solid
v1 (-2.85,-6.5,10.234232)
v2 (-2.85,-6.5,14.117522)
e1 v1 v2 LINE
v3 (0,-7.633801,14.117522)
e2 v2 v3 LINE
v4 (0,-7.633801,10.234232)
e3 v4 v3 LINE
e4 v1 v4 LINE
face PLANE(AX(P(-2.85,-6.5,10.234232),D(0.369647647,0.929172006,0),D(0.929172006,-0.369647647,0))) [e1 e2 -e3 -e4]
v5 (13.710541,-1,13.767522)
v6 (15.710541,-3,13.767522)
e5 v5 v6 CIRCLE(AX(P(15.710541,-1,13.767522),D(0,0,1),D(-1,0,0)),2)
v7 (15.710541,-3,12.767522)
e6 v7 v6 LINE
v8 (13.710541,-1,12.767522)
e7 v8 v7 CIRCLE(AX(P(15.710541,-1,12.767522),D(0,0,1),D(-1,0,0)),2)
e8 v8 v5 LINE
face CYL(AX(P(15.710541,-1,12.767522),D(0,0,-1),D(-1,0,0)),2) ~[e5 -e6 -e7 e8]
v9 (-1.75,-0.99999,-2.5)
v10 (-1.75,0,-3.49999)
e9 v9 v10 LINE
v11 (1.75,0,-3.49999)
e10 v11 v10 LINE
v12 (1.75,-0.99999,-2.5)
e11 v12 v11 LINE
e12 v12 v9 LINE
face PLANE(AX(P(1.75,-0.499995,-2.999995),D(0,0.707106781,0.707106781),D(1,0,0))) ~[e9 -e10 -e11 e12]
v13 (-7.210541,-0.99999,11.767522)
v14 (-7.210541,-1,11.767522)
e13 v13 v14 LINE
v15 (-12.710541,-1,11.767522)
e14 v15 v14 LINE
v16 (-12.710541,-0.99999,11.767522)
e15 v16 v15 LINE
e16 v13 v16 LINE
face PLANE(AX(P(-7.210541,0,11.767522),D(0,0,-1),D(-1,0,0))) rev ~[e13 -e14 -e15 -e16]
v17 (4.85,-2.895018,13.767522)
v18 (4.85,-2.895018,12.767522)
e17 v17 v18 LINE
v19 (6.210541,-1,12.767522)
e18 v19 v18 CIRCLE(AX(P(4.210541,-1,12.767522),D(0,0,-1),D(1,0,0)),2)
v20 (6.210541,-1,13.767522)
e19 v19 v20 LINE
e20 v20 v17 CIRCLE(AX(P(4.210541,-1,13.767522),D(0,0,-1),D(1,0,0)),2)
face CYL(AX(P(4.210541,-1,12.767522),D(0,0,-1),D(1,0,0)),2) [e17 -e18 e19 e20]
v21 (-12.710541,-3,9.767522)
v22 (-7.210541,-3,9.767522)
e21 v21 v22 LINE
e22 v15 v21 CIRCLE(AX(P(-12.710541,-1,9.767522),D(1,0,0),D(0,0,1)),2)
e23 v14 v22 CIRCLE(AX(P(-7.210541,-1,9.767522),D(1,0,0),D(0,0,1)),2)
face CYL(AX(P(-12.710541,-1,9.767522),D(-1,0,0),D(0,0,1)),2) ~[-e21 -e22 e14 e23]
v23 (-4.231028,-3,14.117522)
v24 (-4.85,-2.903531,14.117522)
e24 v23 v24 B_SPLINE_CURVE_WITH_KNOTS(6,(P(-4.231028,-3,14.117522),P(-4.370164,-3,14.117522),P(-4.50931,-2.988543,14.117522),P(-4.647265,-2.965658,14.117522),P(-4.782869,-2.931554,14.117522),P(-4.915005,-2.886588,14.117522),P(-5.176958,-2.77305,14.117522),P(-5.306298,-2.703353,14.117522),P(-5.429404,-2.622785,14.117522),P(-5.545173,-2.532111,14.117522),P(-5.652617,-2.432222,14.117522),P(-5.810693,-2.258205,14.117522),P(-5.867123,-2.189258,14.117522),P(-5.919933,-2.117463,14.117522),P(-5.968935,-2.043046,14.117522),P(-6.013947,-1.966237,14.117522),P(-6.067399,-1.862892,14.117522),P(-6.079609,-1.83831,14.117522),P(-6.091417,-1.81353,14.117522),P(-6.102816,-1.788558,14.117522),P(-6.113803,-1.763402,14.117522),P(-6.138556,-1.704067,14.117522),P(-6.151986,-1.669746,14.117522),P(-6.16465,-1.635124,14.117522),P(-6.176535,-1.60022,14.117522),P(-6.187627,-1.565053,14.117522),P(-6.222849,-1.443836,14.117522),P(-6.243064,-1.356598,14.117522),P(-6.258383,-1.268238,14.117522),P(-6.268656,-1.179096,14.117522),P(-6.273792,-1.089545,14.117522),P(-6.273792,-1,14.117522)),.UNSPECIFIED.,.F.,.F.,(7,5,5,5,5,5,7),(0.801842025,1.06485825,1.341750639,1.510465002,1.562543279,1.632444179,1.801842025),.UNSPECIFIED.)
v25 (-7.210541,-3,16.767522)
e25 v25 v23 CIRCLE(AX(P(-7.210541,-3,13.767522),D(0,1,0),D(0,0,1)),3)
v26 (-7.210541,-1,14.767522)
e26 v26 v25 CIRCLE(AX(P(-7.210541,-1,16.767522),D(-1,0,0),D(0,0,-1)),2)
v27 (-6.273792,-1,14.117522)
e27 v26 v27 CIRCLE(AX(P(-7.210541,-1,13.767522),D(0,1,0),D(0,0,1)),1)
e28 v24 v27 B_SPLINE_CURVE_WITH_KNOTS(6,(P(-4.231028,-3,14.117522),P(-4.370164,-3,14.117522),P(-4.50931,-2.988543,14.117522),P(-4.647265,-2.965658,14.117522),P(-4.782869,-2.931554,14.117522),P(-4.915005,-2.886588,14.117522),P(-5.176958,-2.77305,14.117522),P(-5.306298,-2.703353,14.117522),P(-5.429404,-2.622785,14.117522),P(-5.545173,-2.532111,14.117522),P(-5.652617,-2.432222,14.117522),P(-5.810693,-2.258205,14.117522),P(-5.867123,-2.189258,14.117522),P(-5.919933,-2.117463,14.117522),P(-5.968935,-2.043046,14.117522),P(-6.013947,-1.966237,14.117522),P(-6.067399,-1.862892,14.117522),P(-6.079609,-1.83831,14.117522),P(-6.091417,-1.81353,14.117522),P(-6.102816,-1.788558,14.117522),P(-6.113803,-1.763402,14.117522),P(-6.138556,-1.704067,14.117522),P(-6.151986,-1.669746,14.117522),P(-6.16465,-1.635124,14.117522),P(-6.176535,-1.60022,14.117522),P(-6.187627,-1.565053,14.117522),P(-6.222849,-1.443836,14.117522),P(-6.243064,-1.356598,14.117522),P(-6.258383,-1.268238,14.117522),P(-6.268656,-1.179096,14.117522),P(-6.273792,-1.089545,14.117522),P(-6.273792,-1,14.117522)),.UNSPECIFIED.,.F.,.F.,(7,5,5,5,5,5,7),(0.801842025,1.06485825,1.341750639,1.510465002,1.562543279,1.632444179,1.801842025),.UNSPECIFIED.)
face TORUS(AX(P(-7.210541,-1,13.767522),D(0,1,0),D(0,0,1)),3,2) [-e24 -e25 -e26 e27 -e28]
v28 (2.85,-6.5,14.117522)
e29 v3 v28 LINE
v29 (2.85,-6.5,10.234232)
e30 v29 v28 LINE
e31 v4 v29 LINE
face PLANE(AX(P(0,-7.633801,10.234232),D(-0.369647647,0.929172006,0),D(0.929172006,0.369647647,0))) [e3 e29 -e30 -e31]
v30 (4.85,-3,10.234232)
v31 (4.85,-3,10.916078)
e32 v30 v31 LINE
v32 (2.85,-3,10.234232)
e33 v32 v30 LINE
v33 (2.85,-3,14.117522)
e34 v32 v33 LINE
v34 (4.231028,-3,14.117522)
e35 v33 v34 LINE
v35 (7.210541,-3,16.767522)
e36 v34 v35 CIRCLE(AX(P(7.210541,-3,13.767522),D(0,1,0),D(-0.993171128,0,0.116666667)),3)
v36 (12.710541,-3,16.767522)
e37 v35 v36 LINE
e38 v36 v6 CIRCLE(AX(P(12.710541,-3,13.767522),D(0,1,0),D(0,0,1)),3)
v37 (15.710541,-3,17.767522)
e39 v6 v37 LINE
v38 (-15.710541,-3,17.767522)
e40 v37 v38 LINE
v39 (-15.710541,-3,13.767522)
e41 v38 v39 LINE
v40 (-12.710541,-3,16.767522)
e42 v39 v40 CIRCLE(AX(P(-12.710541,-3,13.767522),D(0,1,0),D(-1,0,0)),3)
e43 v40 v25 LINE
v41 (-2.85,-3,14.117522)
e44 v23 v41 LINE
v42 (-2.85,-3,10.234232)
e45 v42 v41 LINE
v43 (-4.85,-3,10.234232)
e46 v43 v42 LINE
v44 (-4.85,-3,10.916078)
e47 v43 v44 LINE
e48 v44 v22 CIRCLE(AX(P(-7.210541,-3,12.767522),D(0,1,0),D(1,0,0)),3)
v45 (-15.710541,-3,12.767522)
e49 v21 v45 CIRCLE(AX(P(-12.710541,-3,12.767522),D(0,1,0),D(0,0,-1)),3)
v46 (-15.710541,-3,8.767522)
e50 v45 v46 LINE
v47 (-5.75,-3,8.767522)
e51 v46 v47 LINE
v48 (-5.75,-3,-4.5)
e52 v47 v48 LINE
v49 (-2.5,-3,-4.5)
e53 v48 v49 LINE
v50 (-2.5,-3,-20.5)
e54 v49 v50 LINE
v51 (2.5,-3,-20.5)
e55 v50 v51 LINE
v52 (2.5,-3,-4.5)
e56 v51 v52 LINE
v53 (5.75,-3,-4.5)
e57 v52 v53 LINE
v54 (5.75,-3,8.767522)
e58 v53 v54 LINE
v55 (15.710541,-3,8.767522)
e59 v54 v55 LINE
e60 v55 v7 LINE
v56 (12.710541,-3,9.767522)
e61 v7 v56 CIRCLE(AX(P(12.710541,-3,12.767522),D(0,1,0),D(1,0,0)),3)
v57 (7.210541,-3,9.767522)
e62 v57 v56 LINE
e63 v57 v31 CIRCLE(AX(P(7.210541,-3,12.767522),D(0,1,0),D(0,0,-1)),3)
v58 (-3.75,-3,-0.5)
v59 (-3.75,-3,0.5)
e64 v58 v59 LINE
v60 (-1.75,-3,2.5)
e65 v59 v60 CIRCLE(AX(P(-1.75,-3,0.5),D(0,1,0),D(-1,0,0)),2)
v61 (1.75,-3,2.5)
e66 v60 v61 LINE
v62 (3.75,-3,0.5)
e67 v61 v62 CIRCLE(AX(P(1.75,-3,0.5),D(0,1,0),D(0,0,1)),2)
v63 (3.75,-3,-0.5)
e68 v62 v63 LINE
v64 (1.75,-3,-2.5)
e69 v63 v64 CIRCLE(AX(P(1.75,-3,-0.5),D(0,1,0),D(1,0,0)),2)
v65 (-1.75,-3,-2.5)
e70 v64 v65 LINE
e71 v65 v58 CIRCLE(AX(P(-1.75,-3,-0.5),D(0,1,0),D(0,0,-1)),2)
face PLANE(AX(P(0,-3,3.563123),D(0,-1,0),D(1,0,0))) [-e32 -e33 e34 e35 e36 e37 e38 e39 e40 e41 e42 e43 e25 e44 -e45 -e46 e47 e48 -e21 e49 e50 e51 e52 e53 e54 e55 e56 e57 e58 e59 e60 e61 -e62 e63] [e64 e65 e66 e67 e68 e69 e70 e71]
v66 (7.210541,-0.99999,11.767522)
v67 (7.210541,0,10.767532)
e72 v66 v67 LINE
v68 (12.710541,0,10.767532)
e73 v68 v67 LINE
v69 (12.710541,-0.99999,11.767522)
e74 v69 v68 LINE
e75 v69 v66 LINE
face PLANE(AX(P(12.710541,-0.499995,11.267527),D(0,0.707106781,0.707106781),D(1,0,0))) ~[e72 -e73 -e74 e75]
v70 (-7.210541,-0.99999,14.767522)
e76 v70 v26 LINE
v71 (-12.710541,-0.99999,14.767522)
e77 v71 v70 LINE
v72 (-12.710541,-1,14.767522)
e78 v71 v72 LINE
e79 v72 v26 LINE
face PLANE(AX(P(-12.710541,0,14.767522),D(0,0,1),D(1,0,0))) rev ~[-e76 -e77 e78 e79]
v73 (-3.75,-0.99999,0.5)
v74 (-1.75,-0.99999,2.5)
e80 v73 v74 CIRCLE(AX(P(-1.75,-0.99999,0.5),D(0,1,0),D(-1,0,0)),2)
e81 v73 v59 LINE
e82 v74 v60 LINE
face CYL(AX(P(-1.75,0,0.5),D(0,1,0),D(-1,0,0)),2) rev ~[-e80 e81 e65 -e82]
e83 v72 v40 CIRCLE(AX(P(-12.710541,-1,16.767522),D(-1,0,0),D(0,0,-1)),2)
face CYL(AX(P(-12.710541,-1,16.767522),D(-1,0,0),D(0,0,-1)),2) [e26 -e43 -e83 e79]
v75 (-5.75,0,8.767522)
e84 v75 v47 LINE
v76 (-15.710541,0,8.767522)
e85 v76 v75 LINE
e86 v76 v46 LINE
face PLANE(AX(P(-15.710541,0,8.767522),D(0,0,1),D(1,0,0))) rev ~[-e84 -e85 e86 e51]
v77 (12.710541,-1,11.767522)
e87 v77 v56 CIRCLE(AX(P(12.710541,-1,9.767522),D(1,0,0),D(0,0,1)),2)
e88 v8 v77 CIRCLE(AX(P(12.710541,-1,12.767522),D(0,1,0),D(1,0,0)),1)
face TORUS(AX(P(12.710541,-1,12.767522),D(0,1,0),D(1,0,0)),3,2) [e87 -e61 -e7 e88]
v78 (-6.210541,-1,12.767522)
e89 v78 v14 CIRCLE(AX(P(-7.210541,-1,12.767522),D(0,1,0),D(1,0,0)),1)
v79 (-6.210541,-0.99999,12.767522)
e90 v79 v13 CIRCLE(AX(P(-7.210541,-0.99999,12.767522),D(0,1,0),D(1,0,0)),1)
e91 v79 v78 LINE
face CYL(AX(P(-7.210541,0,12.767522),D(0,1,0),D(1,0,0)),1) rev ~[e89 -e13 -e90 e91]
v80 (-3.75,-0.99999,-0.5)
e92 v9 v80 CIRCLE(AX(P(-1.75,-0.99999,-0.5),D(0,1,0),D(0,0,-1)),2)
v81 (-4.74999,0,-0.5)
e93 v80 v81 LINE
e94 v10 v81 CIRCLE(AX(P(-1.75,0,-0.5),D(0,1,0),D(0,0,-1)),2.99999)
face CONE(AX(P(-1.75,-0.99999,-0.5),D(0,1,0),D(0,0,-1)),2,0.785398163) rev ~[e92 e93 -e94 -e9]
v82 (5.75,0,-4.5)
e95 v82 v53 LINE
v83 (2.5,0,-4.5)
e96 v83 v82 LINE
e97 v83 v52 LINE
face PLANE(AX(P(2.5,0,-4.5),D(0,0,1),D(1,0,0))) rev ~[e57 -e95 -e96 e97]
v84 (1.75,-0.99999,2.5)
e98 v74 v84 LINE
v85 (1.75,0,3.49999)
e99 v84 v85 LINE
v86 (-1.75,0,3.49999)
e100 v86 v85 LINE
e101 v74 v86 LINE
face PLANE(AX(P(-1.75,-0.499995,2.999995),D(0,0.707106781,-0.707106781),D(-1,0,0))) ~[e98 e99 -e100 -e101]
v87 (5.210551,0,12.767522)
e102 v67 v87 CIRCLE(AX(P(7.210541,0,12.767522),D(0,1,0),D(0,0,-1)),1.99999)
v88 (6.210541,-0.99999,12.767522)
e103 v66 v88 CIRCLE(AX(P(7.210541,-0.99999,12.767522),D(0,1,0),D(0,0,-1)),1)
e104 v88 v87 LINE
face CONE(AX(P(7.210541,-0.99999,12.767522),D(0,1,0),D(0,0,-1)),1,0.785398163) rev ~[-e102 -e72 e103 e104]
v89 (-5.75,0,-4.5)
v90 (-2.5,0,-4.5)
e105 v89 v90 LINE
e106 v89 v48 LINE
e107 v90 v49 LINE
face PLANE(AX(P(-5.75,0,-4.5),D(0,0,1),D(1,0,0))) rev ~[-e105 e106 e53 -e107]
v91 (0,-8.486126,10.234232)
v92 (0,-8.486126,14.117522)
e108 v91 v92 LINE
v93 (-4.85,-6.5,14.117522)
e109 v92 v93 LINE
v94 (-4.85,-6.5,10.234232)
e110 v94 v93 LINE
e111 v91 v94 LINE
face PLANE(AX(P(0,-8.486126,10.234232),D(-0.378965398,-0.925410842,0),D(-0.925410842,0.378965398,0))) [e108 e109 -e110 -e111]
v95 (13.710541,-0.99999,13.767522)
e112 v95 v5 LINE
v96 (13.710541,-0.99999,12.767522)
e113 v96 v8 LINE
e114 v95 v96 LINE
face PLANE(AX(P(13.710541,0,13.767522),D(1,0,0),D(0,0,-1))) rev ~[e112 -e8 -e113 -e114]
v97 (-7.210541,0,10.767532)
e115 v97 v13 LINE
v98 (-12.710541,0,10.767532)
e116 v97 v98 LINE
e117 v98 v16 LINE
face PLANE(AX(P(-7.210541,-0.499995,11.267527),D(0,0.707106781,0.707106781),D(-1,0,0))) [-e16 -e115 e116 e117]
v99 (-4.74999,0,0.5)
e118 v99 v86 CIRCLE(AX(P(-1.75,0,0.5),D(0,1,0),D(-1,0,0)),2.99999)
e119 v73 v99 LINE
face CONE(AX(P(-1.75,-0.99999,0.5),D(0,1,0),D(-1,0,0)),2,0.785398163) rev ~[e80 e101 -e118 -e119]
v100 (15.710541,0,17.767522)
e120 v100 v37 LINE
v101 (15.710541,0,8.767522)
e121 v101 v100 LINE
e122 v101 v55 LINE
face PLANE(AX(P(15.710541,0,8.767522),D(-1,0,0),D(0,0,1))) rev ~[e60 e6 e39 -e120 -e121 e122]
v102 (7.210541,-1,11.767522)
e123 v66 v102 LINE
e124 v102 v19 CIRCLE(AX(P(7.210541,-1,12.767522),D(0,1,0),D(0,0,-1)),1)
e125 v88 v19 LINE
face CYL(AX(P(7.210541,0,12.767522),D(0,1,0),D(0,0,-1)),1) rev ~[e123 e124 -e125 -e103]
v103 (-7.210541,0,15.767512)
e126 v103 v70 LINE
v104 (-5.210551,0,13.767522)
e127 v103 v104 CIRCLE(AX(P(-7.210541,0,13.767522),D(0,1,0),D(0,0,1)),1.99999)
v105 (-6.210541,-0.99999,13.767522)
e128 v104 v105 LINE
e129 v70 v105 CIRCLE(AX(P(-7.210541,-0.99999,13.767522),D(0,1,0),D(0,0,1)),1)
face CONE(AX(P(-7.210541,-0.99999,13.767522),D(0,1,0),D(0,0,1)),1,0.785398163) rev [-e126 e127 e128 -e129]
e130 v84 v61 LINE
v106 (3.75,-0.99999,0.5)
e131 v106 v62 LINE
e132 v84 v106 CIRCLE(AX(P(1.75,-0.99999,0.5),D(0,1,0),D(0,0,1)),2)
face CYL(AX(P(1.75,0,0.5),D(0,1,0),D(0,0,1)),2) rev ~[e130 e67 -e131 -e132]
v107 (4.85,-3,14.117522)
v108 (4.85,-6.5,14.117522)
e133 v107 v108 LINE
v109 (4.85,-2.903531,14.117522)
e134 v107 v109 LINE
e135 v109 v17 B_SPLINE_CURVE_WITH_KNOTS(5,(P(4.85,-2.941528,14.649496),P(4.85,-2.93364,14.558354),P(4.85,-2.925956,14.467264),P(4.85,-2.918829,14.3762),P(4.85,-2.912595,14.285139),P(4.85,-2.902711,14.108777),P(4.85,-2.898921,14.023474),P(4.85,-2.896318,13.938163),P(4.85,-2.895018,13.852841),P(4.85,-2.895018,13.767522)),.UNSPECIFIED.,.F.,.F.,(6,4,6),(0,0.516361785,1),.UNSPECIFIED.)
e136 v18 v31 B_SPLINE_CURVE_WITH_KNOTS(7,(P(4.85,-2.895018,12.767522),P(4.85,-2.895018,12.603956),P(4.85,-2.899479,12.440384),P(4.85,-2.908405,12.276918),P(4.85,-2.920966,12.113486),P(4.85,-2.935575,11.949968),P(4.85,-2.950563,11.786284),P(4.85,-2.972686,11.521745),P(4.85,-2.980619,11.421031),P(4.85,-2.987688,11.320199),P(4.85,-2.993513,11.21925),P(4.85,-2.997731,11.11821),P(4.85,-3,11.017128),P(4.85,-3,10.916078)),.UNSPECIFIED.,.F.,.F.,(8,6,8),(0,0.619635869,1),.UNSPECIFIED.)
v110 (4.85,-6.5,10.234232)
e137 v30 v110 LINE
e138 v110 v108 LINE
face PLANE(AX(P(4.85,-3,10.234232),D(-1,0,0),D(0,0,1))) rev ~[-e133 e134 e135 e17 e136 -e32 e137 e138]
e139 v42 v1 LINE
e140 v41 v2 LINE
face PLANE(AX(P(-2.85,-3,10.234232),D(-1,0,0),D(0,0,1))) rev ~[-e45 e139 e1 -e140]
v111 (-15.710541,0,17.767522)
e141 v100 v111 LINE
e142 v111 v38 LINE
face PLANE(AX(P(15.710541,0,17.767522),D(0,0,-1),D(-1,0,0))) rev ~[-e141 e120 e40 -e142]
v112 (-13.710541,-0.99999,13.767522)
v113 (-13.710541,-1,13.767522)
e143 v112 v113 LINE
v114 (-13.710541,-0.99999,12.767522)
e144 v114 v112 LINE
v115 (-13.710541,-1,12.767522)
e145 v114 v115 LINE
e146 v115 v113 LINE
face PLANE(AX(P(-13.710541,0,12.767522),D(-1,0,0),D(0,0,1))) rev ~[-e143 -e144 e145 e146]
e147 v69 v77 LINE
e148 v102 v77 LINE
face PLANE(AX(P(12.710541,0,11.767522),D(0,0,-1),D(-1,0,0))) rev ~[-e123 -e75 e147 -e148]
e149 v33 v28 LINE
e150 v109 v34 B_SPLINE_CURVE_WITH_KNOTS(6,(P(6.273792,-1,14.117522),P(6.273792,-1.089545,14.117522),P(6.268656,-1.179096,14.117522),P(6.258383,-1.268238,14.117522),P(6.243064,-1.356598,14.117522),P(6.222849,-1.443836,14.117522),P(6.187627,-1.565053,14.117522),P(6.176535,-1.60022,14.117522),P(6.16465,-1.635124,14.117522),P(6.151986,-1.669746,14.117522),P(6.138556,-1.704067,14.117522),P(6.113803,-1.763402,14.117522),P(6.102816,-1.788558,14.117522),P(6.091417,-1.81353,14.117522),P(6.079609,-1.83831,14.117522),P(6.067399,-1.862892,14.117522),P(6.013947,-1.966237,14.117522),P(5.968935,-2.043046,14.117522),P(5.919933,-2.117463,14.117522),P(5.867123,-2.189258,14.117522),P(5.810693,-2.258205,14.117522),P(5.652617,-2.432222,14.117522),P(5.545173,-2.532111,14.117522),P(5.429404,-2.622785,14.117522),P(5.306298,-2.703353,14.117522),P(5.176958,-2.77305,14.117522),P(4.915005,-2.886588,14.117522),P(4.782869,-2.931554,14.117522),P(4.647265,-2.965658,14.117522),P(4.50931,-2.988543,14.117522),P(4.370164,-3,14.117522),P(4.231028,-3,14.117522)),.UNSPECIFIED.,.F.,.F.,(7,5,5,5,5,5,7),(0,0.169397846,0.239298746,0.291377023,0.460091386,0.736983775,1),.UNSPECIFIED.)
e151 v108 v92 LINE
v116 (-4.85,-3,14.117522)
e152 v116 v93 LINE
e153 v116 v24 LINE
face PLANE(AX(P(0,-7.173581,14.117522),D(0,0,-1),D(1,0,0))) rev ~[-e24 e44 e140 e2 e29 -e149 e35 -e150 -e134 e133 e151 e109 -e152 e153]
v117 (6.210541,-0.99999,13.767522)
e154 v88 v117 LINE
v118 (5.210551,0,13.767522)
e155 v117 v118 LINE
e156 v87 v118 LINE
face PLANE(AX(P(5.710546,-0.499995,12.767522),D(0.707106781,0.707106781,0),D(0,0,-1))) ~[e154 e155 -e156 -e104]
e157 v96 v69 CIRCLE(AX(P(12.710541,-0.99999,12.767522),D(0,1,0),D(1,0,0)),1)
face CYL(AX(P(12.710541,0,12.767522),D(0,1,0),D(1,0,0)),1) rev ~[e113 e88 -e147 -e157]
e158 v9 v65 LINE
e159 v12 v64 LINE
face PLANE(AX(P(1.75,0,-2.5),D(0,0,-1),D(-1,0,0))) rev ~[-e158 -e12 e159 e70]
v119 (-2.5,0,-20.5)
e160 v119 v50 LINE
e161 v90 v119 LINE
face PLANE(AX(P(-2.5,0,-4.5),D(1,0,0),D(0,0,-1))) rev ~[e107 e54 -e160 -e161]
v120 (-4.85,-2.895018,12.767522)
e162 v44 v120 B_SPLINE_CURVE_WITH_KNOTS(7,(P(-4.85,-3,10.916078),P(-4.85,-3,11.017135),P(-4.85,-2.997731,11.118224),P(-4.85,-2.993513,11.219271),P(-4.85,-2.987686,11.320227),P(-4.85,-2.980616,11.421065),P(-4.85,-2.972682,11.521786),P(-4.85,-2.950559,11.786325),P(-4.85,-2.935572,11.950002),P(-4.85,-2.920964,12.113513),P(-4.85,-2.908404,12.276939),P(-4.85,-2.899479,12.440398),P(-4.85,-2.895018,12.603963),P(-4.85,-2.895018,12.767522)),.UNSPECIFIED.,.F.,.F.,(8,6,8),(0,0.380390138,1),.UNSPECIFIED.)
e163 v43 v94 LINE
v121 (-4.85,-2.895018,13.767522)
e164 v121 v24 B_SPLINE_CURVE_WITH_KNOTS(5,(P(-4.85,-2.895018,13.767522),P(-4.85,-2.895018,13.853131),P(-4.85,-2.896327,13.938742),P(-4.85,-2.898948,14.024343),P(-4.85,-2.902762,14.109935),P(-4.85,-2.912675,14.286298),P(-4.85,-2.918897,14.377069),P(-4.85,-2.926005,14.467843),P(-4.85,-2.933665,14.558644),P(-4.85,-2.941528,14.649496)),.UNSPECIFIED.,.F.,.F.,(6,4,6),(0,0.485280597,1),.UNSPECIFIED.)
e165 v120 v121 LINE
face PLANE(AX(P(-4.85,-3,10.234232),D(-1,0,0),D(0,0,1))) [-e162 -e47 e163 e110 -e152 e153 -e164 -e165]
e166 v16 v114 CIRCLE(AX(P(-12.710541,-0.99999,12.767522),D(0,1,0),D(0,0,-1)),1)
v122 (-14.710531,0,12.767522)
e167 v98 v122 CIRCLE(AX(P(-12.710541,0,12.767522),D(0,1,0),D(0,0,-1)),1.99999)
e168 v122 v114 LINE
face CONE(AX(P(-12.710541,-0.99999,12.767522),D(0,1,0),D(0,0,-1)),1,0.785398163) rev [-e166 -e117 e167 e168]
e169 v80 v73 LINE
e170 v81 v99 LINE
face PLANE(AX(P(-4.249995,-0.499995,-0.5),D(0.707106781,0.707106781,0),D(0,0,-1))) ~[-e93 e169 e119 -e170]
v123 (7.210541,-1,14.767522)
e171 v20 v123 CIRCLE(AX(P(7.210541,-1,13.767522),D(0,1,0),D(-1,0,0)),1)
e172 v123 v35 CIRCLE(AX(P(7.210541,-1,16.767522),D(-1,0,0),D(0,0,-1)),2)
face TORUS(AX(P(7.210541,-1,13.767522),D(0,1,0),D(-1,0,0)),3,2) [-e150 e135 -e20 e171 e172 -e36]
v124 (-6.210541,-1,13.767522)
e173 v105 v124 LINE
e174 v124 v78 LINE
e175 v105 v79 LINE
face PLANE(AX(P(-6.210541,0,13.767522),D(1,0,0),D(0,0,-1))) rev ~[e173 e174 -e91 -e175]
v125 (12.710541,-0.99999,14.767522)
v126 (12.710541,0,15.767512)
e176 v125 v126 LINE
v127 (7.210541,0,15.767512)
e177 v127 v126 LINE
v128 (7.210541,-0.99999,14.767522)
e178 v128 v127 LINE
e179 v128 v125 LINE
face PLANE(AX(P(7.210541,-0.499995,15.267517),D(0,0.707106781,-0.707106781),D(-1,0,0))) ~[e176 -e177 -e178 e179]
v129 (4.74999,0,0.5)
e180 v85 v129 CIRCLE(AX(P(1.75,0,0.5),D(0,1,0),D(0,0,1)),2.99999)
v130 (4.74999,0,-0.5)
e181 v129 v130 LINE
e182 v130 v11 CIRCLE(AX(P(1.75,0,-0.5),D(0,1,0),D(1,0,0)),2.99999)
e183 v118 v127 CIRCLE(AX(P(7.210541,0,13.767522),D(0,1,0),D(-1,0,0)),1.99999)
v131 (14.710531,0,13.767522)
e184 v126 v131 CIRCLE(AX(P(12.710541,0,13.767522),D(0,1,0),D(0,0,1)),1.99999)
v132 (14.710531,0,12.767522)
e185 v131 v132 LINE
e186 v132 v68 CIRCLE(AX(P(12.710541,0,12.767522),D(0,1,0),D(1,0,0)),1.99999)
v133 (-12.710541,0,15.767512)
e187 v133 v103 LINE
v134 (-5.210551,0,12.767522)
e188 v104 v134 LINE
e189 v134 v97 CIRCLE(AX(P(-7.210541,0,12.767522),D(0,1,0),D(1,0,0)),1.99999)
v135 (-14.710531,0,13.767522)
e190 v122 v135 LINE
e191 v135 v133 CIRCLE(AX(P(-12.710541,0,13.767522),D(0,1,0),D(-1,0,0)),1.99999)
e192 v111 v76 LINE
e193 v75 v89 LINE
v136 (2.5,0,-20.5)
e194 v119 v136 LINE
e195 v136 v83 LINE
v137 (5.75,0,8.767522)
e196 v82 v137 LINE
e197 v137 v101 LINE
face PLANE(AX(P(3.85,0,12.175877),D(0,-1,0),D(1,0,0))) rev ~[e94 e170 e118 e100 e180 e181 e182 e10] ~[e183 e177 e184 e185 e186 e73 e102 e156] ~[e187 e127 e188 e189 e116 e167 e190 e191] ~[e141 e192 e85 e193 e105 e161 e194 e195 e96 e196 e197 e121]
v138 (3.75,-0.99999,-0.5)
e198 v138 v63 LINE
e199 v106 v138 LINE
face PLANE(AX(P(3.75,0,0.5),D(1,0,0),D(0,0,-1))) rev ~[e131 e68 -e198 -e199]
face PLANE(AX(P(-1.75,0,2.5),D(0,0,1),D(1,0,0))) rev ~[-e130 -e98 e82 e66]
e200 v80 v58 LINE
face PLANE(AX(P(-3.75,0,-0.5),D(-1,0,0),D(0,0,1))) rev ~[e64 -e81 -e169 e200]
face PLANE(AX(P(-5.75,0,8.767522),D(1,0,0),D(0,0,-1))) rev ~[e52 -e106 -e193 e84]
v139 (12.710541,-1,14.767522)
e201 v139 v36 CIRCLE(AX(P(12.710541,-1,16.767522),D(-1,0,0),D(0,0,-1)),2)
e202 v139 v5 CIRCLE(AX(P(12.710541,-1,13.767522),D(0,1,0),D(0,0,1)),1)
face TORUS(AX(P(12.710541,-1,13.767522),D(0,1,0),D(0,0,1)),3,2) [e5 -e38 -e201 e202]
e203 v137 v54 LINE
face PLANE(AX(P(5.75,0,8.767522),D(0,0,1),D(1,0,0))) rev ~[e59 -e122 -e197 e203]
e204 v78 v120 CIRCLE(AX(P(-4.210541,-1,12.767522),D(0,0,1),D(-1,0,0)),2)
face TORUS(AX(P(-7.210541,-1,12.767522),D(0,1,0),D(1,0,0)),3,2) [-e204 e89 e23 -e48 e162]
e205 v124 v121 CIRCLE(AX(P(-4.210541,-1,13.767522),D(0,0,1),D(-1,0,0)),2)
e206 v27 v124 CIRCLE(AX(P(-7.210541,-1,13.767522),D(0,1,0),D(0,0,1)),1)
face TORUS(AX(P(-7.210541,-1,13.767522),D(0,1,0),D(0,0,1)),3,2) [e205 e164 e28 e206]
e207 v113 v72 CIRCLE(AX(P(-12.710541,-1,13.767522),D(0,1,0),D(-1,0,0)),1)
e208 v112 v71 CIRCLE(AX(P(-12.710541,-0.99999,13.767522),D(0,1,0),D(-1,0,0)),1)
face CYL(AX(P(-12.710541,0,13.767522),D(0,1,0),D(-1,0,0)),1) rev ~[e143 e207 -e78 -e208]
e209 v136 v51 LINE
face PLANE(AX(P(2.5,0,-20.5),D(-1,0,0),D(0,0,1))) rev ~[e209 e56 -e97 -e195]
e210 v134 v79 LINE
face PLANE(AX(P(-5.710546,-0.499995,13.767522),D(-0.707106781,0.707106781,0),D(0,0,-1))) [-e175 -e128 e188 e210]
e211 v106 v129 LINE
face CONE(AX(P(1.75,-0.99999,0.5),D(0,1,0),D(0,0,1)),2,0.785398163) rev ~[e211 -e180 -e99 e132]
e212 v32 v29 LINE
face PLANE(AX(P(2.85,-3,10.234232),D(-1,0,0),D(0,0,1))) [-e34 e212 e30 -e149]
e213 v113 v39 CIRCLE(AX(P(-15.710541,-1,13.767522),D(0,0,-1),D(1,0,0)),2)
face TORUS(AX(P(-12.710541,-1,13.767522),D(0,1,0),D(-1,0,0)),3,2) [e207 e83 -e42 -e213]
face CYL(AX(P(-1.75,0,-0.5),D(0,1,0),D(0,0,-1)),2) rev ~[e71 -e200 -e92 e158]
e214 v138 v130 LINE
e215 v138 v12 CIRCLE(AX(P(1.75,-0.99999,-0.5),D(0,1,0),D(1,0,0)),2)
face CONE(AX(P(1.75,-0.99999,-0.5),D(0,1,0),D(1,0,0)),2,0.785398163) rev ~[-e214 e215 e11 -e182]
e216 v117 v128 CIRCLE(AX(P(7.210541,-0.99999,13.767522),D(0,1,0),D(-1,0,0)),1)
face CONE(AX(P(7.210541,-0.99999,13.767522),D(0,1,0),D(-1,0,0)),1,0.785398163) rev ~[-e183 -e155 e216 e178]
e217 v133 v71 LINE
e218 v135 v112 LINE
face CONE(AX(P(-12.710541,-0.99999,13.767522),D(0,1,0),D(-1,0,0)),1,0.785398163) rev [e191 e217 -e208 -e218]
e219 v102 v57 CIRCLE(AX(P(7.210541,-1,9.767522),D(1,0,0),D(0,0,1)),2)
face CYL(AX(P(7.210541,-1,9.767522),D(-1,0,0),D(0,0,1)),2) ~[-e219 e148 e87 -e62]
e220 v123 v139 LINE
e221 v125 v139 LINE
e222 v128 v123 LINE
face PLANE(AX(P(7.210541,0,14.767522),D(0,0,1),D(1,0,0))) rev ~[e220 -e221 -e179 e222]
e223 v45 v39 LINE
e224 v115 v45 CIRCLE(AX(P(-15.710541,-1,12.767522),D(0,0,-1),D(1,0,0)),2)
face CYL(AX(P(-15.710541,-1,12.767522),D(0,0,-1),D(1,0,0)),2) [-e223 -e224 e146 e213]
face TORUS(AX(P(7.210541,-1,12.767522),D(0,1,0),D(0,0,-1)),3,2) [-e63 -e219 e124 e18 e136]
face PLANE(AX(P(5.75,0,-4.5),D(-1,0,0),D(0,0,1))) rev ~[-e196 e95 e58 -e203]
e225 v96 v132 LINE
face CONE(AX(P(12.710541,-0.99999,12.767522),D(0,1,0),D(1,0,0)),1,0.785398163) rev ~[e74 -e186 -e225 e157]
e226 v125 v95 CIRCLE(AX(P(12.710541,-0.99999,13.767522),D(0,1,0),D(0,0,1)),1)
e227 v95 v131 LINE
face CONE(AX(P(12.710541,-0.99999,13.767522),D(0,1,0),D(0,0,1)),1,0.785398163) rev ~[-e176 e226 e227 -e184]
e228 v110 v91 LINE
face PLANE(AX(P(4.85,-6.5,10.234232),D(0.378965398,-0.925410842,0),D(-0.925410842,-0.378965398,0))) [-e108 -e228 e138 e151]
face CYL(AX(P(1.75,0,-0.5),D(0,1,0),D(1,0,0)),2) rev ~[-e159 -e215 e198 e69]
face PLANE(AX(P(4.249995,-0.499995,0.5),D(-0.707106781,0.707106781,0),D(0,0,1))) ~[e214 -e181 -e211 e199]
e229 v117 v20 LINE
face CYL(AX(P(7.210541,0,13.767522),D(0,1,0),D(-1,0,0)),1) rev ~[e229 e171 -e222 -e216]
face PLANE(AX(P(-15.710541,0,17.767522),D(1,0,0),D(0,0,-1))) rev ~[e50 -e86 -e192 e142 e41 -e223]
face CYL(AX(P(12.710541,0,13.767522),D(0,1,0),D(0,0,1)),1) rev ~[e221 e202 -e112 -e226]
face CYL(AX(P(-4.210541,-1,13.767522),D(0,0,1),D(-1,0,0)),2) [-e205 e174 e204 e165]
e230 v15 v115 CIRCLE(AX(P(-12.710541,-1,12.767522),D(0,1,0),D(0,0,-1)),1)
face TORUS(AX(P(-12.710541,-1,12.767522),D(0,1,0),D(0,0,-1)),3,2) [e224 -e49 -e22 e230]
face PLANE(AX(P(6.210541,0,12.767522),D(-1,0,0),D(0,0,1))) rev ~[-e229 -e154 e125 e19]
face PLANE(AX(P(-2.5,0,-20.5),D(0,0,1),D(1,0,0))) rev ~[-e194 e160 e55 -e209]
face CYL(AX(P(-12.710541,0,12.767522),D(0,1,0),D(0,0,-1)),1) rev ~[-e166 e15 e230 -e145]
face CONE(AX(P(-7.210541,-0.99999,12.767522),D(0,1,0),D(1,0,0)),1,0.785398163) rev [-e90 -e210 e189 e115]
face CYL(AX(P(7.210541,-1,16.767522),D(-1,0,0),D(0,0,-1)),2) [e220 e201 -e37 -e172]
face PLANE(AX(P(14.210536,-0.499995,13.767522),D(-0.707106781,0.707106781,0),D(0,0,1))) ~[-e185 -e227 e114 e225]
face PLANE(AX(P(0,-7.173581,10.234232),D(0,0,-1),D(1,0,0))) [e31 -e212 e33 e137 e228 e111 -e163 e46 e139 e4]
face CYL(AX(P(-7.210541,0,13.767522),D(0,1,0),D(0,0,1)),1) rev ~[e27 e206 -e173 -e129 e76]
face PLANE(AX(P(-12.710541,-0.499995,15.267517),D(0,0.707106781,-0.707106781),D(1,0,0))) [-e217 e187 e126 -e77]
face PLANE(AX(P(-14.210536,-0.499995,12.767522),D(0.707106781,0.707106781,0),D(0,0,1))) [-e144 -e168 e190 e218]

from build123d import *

# Parameters (mm, degrees)
F0_W         = 2
F0_H         = 3.8832901515
F1_DEPTH     = 3
F2_DEPTH     = 3
F2_FACE_W    = 2
F2_FACE_H    = 3.8832901515
F3_DEPTH     = 3.5
F5_DEPTH     = 3.8832901515
F6_T1_DEPTH  = 5.5
F6_T3_DEPTH  = 5.5
F6_T5_DEPTH  = 1
F6_T8_ANGLE  = 90
F6_T12_ANGLE = 90
F6_T17_DEPTH = 1
F6_T22_ANGLE = 90
F6_T28_ANGLE = 90
F6_T34_ANGLE = 90
F6_T38_ANGLE = 90
F6_T42_ANGLE = 90
F6_T45_ANGLE = 90
F6_T47_ANGLE = 90
F6_T51_ANGLE = 90
F6_T57_ANGLE = 90
F6_T63_ANGLE = 90
F6_T69_DEPTH = 1
F7_SIZE      = 0.99999


# Not quite as in the source:
# - a fillet or chamfer that OpenCascade refuses, or shapes differently, is made with other operations: its cross-section is extruded or revolved along the edge and cut away or added
# - a fillet or chamfer is up to 0.001 mm smaller than in the source, because OpenCascade refuses the exact size


with BuildPart() as f1:
    # F0 (on Front) → F1 (new body)
    with BuildSketch(Plane.XZ):
        Polygon((15.7105413526, 17.7675217465), (-5.75, 17.7675217465), (-15.7105413526, 17.7675217465), (-15.7105413526, 8.7675217465), (-5.75, 8.7675217465), (-5.75, -4.5), (-2.5, -4.5), (-2.5, -20.5), (2.5, -20.5), (2.5, -4.5), (5.75, -4.5), (5.75, 8.7675217465), (15.7105413526, 8.7675217465), (15.7105413526, 15.6582586542), align=None)
        with BuildLine():
            Line((-12.7105413526, 14.7675217465), (-7.2105413526, 14.7675217465))
            ThreePointArc((-7.2105413526, 14.7675217465), (-6.5034345714, 14.4746285276), (-6.2105413526, 13.7675217465))
            Line((-6.2105413526, 13.7675217465), (-6.2105413526, 12.7675217465))
            ThreePointArc((-6.2105413526, 12.7675217465), (-6.5034345714, 12.0604149653), (-7.2105413526, 11.7675217465))
            Line((-7.2105413526, 11.7675217465), (-12.7105413526, 11.7675217465))
            ThreePointArc((-12.7105413526, 11.7675217465), (-13.4176481338, 12.0604149653), (-13.7105413526, 12.7675217465))
            Line((-13.7105413526, 12.7675217465), (-13.7105413526, 13.7675217465))
            ThreePointArc((-13.7105413526, 13.7675217465), (-13.4176481338, 14.4746285276), (-12.7105413526, 14.7675217465))
        make_face(mode=Mode.SUBTRACT)
        with Locations((-3.85, 12.1758766707)):
            Rectangle(F0_W, F0_H, mode=Mode.SUBTRACT)
        with BuildLine():
            ThreePointArc((-3.75, 0.5), (-3.1642135624, 1.9142135624), (-1.75, 2.5))
            Line((-1.75, 2.5), (1.75, 2.5))
            ThreePointArc((1.75, 2.5), (3.1642135624, 1.9142135624), (3.75, 0.5))
            Line((3.75, 0.5), (3.75, -0.5))
            ThreePointArc((3.75, -0.5), (3.1642135624, -1.9142135624), (1.75, -2.5))
            Line((1.75, -2.5), (-1.75, -2.5))
            ThreePointArc((-1.75, -2.5), (-3.1642135624, -1.9142135624), (-3.75, -0.5))
            Line((-3.75, -0.5), (-3.75, 0.5))
        make_face(mode=Mode.SUBTRACT)
        with Locations((3.85, 12.1758766707)):
            Rectangle(F0_W, F0_H, mode=Mode.SUBTRACT)
        with BuildLine():
            ThreePointArc((7.2105413526, 11.7675217465), (6.5034345714, 12.0604149653), (6.2105413526, 12.7675217465))
            Line((6.2105413526, 12.7675217465), (6.2105413526, 13.7675217465))
            ThreePointArc((6.2105413526, 13.7675217465), (6.5034345714, 14.4746285276), (7.2105413526, 14.7675217465))
            Line((7.2105413526, 14.7675217465), (12.7105413526, 14.7675217465))
            ThreePointArc((12.7105413526, 14.7675217465), (13.4176481338, 14.4746285276), (13.7105413526, 13.7675217465))
            Line((13.7105413526, 13.7675217465), (13.7105413526, 12.7675217465))
            ThreePointArc((13.7105413526, 12.7675217465), (13.4176481338, 12.0604149653), (12.7105413526, 11.7675217465))
            Line((12.7105413526, 11.7675217465), (7.2105413526, 11.7675217465))
        make_face(mode=Mode.SUBTRACT)
    extrude(amount=F1_DEPTH)



with BuildPart() as f2:
    # F0 (on Front) → F2 (new body, through all)
    with BuildSketch(Plane.XZ):
        with Locations((-3.85, 12.1758766707)):
            Rectangle(F0_W, F0_H)
    extrude(amount=F2_DEPTH)


with BuildPart() as f2b:
    # F0 (on Front) → F2, piece 2 (new body, through all)
    with BuildSketch(Plane.XZ):
        with Locations((3.85, 12.1758766707)):
            Rectangle(F0_W, F0_H)
    extrude(amount=F2_DEPTH)


with BuildPart() as f1_1:
    add(f1.part)

    add(f2.part)  # F3 merges F2

    add(f2b.part)  # F3 merges F2b
    # F2_face (on face) → F3 (join)
    with BuildSketch(Plane(origin=(-3.85, -3, 12.1758766707), x_dir=(1, 0, 0), z_dir=(0, -1, 0))):
        Rectangle(F2_FACE_W, F2_FACE_H)
        with Locations((7.7, 0)):
            Rectangle(F2_FACE_W, F2_FACE_H)
    extrude(amount=F3_DEPTH)

    # F4 (on face) → F5 (join, through all)
    with BuildSketch(Plane(origin=(0, 0, 10.2342315949), x_dir=(1, 0, 0), z_dir=(0, 0, -1))):
        Polygon((-4.85, 6.5), (-2.85, 6.5), (0, 7.6338006184), (2.85, 6.5), (4.85, 6.5), (0, 8.4861256182), align=None)
    extrude(amount=-F5_DEPTH)

    # F6: fillet of radius 2 on 2 edges, made by hand

    # F6_s2 → F6_t1 (cut)
    with BuildSketch(Plane.YZ.offset(-12.7105413526)):
        with BuildLine():
            ThreePointArc((-1, 11.7675217465), (-2.4142135624, 11.1817353088), (-3, 9.7675217465))
            Line((-3, 9.7675217465), (-3, 11.7675217465))
            Line((-3, 11.7675217465), (-1, 11.7675217465))
        make_face()
        with BuildLine():
            ThreePointArc((-1, 14.7675217465), (-2.4142135624, 15.3533081841), (-3, 16.7675217465))
            Line((-3, 16.7675217465), (-3, 14.7675217465))
            Line((-3, 14.7675217465), (-1, 14.7675217465))
        make_face()
    extrude(amount=F6_T1_DEPTH, mode=Mode.SUBTRACT)

    # F6_s4 → F6_t3 (cut)
    with BuildSketch(Plane.YZ.offset(7.2105413526)):
        with BuildLine():
            ThreePointArc((-1, 11.7675217465), (-2.4142135624, 11.1817353088), (-3, 9.7675217465))
            Line((-3, 9.7675217465), (-3, 11.7675217465))
            Line((-3, 11.7675217465), (-1, 11.7675217465))
        make_face()
        with BuildLine():
            ThreePointArc((-1, 14.7675217465), (-2.4142135624, 15.3533081841), (-3, 16.7675217465))
            Line((-3, 16.7675217465), (-3, 14.7675217465))
            Line((-3, 14.7675217465), (-1, 14.7675217465))
        make_face()
    extrude(amount=F6_T3_DEPTH, mode=Mode.SUBTRACT)

    # F6_s6 → F6_t5 (cut)
    with BuildSketch(Plane.XY.offset(12.7675217465)):
        with BuildLine():
            ThreePointArc((13.7105413526, -1), (14.2963277903, -2.4142135624), (15.7105413526, -3))
            Line((15.7105413526, -3), (13.7105413526, -3))
            Line((13.7105413526, -3), (13.7105413526, -1))
        make_face()
        with BuildLine():
            ThreePointArc((-13.7105413526, -1), (-14.2963277903, -2.4142135624), (-15.7105413526, -3))
            Line((-15.7105413526, -3), (-13.7105413526, -3))
            Line((-13.7105413526, -3), (-13.7105413526, -1))
        make_face()
    extrude(amount=F6_T5_DEPTH, mode=Mode.SUBTRACT)

    # F6_s7 → F6_t8 (revolve, cut)
    with BuildSketch(Plane.XY.offset(12.7675217465)):
        with BuildLine():
            ThreePointArc((13.7105413526, -1), (14.2963277903, -2.4142135624), (15.7105413526, -3))
            Line((15.7105413526, -3), (13.7105413526, -3))
            Line((13.7105413526, -3), (13.7105413526, -1))
        make_face()
    revolve(axis=Axis((12.7105413526, -3, 12.7675217465), (0, 1, 0)), revolution_arc=F6_T8_ANGLE, mode=Mode.SUBTRACT)


with BuildPart() as f6_tool10:
    # F6_s11 → F6_t12 (revolve)
    with BuildSketch(Plane.YZ.offset(7.2105413526)):
        with BuildLine():
            ThreePointArc((-1, 11.7675217465), (-2.4142135624, 11.1817353088), (-3, 9.7675217465))
            Line((-3, 9.7675217465), (-3, 11.7675217465))
            Line((-3, 11.7675217465), (-1, 11.7675217465))
        make_face()
    revolve(axis=Axis((7.2105413526, -3, 12.7675217465), (0, 1, 0)), revolution_arc=F6_T12_ANGLE)

    split(bisect_by=Plane.YZ.offset(4.85), keep=Keep.TOP)


with BuildPart() as f1_2:
    add(f1_1.part)

    # F6_t9: cut F6_tool10
    add(f6_tool10.part, mode=Mode.SUBTRACT)


with BuildPart() as f6_tool15:
    # F6_s16 → F6_t17 (new body)
    with BuildSketch(Plane.XY.offset(12.7675217465)):
        with BuildLine():
            ThreePointArc((6.2105413526, -1), (5.624754915, -2.4142135624), (4.2105413526, -3))
            Line((4.2105413526, -3), (6.2105413526, -3))
            Line((6.2105413526, -3), (6.2105413526, -1))
        make_face()
    extrude(amount=F6_T17_DEPTH)

    split(bisect_by=Plane.YZ.offset(4.85), keep=Keep.TOP)


with BuildPart() as f1_3:
    add(f1_2.part)

    # F6_t14: cut F6_tool15
    add(f6_tool15.part, mode=Mode.SUBTRACT)


with BuildPart() as f6_tool20:
    # F6_s21 → F6_t22 (revolve)
    with BuildSketch(Plane.XY.offset(13.7675217465)):
        with BuildLine():
            ThreePointArc((6.2105413526, -1), (5.624754915, -2.4142135624), (4.2105413526, -3))
            Line((4.2105413526, -3), (6.2105413526, -3))
            Line((6.2105413526, -3), (6.2105413526, -1))
        make_face()
    revolve(axis=Axis((7.2105413526, -3, 13.7675217465), (0, 1, 0)), revolution_arc=F6_T22_ANGLE)

    split(bisect_by=Plane.XY.offset(14.1175217465), keep=Keep.BOTTOM)

    split(bisect_by=Plane.YZ.offset(4.85), keep=Keep.TOP)


with BuildPart() as f1_4:
    add(f1_3.part)

    # F6_t19: cut F6_tool20
    add(f6_tool20.part, mode=Mode.SUBTRACT)


with BuildPart() as f6_tool26:
    # F6_s27 → F6_t28 (revolve)
    with BuildSketch(Plane.XY.offset(13.7675217465)):
        with BuildLine():
            ThreePointArc((6.2105413526, -1), (5.624754915, -2.4142135624), (4.2105413526, -3))
            Line((4.2105413526, -3), (6.2105413526, -3))
            Line((6.2105413526, -3), (6.2105413526, -1))
        make_face()
    revolve(axis=Axis((7.2105413526, -3, 13.7675217465), (0, 1, 0)), revolution_arc=F6_T28_ANGLE)

    split(bisect_by=Plane.XY.offset(14.1175217465), keep=Keep.TOP)

    split(bisect_by=Plane.YZ.offset(4.85), keep=Keep.TOP)


with BuildPart() as f1_5:
    add(f1_4.part)

    # F6_t25: cut F6_tool26
    add(f6_tool26.part, mode=Mode.SUBTRACT)


with BuildPart() as f6_tool32:
    # F6_s33 → F6_t34 (revolve)
    with BuildSketch(Plane.XY.offset(13.7675217465)):
        with BuildLine():
            ThreePointArc((6.2105413526, -1), (5.624754915, -2.4142135624), (4.2105413526, -3))
            Line((4.2105413526, -3), (6.2105413526, -3))
            Line((6.2105413526, -3), (6.2105413526, -1))
        make_face()
    revolve(axis=Axis((7.2105413526, -3, 13.7675217465), (0, 1, 0)), revolution_arc=F6_T34_ANGLE)

    split(bisect_by=Plane.XY.offset(14.1175217465), keep=Keep.TOP)

    split(bisect_by=Plane.YZ.offset(4.85), keep=Keep.BOTTOM)


with BuildPart() as f1_6:
    add(f1_5.part)

    # F6_t31: cut F6_tool32
    add(f6_tool32.part, mode=Mode.SUBTRACT)

    # F6_s37 → F6_t38 (revolve, cut)
    with BuildSketch(Plane.YZ.offset(12.7105413526)):
        with BuildLine():
            ThreePointArc((-1, 14.7675217465), (-2.4142135624, 15.3533081841), (-3, 16.7675217465))
            Line((-3, 16.7675217465), (-3, 14.7675217465))
            Line((-3, 14.7675217465), (-1, 14.7675217465))
        make_face()
    revolve(axis=Axis((12.7105413526, -3, 13.7675217465), (0, 1, 0)), revolution_arc=F6_T38_ANGLE, mode=Mode.SUBTRACT)


with BuildPart() as f6_tool40:
    # F6_s41 → F6_t42 (revolve)
    with BuildSketch(Plane.XY.offset(12.7675217465)):
        with BuildLine():
            ThreePointArc((-6.2105413526, -1), (-5.624754915, -2.4142135624), (-4.2105413526, -3))
            Line((-4.2105413526, -3), (-6.2105413526, -3))
            Line((-6.2105413526, -3), (-6.2105413526, -1))
        make_face()
    revolve(axis=Axis((-7.2105413526, -3, 12.7675217465), (0, 1, 0)), revolution_arc=F6_T42_ANGLE)

    split(bisect_by=Plane.YZ.offset(-4.85), keep=Keep.BOTTOM)


with BuildPart() as f1_7:
    add(f1_6.part)

    # F6_t39: cut F6_tool40
    add(f6_tool40.part, mode=Mode.SUBTRACT)

    # F6_s44 → F6_t45 (revolve, cut)
    with BuildSketch(Plane.YZ.offset(-12.7105413526)):
        with BuildLine():
            ThreePointArc((-1, 11.7675217465), (-2.4142135624, 11.1817353088), (-3, 9.7675217465))
            Line((-3, 9.7675217465), (-3, 11.7675217465))
            Line((-3, 11.7675217465), (-1, 11.7675217465))
        make_face()
    revolve(axis=Axis((-12.7105413526, -3, 12.7675217465), (0, 1, 0)), revolution_arc=F6_T45_ANGLE, mode=Mode.SUBTRACT)

    # F6_s46 → F6_t47 (revolve, cut)
    with BuildSketch(Plane.XY.offset(13.7675217465)):
        with BuildLine():
            ThreePointArc((-13.7105413526, -1), (-14.2963277903, -2.4142135624), (-15.7105413526, -3))
            Line((-15.7105413526, -3), (-13.7105413526, -3))
            Line((-13.7105413526, -3), (-13.7105413526, -1))
        make_face()
    revolve(axis=Axis((-12.7105413526, -3, 13.7675217465), (0, 1, 0)), revolution_arc=F6_T47_ANGLE, mode=Mode.SUBTRACT)


with BuildPart() as f6_tool49:
    # F6_s50 → F6_t51 (revolve)
    with BuildSketch(Plane.YZ.offset(-7.2105413526)):
        with BuildLine():
            ThreePointArc((-1, 14.7675217465), (-2.4142135624, 15.3533081841), (-3, 16.7675217465))
            Line((-3, 16.7675217465), (-3, 14.7675217465))
            Line((-3, 14.7675217465), (-1, 14.7675217465))
        make_face()
    revolve(axis=Axis((-7.2105413526, -3, 13.7675217465), (0, 1, 0)), revolution_arc=F6_T51_ANGLE)

    split(bisect_by=Plane.XY.offset(14.1175217465), keep=Keep.TOP)

    split(bisect_by=Plane.YZ.offset(-4.85), keep=Keep.BOTTOM)


with BuildPart() as f1_8:
    add(f1_7.part)

    # F6_t48: cut F6_tool49
    add(f6_tool49.part, mode=Mode.SUBTRACT)


with BuildPart() as f6_tool55:
    # F6_s56 → F6_t57 (revolve)
    with BuildSketch(Plane.YZ.offset(-7.2105413526)):
        with BuildLine():
            ThreePointArc((-1, 14.7675217465), (-2.4142135624, 15.3533081841), (-3, 16.7675217465))
            Line((-3, 16.7675217465), (-3, 14.7675217465))
            Line((-3, 14.7675217465), (-1, 14.7675217465))
        make_face()
    revolve(axis=Axis((-7.2105413526, -3, 13.7675217465), (0, 1, 0)), revolution_arc=F6_T57_ANGLE)

    split(bisect_by=Plane.XY.offset(14.1175217465), keep=Keep.TOP)

    split(bisect_by=Plane.YZ.offset(-4.85), keep=Keep.TOP)


with BuildPart() as f1_9:
    add(f1_8.part)

    # F6_t54: cut F6_tool55
    add(f6_tool55.part, mode=Mode.SUBTRACT)


with BuildPart() as f6_tool61:
    # F6_s62 → F6_t63 (revolve)
    with BuildSketch(Plane.YZ.offset(-7.2105413526)):
        with BuildLine():
            ThreePointArc((-1, 14.7675217465), (-2.4142135624, 15.3533081841), (-3, 16.7675217465))
            Line((-3, 16.7675217465), (-3, 14.7675217465))
            Line((-3, 14.7675217465), (-1, 14.7675217465))
        make_face()
    revolve(axis=Axis((-7.2105413526, -3, 13.7675217465), (0, 1, 0)), revolution_arc=F6_T63_ANGLE)

    split(bisect_by=Plane.XY.offset(14.1175217465), keep=Keep.BOTTOM)

    split(bisect_by=Plane.YZ.offset(-4.85), keep=Keep.BOTTOM)


with BuildPart() as f1_10:
    add(f1_9.part)

    # F6_t60: cut F6_tool61
    add(f6_tool61.part, mode=Mode.SUBTRACT)


with BuildPart() as f6_tool67:
    # F6_s68 → F6_t69 (new body)
    with BuildSketch(Plane.XY.offset(13.7675217465)):
        with BuildLine():
            ThreePointArc((-6.2105413526, -1), (-5.624754915, -2.4142135624), (-4.2105413526, -3))
            Line((-4.2105413526, -3), (-6.2105413526, -3))
            Line((-6.2105413526, -3), (-6.2105413526, -1))
        make_face()
    extrude(amount=-F6_T69_DEPTH)

    split(bisect_by=Plane.YZ.offset(-4.85), keep=Keep.BOTTOM)


with BuildPart() as f1_11:
    add(f1_10.part)

    # F6_t66: cut F6_tool67
    add(f6_tool67.part, mode=Mode.SUBTRACT)

    # F7 (size 1 in the source; OpenCascade refuses exactly that, so slightly less here)
    f7_edges = [f1_11.edges().sort_by_distance(p)[0] for p in [
        (-9.960541, 0, 11.767522),
        (6.503435, 0, 14.474629),
        (0, 0, 2.5),
    ]]
    chamfer(f7_edges, length=F7_SIZE)


solid = f1_11.part
